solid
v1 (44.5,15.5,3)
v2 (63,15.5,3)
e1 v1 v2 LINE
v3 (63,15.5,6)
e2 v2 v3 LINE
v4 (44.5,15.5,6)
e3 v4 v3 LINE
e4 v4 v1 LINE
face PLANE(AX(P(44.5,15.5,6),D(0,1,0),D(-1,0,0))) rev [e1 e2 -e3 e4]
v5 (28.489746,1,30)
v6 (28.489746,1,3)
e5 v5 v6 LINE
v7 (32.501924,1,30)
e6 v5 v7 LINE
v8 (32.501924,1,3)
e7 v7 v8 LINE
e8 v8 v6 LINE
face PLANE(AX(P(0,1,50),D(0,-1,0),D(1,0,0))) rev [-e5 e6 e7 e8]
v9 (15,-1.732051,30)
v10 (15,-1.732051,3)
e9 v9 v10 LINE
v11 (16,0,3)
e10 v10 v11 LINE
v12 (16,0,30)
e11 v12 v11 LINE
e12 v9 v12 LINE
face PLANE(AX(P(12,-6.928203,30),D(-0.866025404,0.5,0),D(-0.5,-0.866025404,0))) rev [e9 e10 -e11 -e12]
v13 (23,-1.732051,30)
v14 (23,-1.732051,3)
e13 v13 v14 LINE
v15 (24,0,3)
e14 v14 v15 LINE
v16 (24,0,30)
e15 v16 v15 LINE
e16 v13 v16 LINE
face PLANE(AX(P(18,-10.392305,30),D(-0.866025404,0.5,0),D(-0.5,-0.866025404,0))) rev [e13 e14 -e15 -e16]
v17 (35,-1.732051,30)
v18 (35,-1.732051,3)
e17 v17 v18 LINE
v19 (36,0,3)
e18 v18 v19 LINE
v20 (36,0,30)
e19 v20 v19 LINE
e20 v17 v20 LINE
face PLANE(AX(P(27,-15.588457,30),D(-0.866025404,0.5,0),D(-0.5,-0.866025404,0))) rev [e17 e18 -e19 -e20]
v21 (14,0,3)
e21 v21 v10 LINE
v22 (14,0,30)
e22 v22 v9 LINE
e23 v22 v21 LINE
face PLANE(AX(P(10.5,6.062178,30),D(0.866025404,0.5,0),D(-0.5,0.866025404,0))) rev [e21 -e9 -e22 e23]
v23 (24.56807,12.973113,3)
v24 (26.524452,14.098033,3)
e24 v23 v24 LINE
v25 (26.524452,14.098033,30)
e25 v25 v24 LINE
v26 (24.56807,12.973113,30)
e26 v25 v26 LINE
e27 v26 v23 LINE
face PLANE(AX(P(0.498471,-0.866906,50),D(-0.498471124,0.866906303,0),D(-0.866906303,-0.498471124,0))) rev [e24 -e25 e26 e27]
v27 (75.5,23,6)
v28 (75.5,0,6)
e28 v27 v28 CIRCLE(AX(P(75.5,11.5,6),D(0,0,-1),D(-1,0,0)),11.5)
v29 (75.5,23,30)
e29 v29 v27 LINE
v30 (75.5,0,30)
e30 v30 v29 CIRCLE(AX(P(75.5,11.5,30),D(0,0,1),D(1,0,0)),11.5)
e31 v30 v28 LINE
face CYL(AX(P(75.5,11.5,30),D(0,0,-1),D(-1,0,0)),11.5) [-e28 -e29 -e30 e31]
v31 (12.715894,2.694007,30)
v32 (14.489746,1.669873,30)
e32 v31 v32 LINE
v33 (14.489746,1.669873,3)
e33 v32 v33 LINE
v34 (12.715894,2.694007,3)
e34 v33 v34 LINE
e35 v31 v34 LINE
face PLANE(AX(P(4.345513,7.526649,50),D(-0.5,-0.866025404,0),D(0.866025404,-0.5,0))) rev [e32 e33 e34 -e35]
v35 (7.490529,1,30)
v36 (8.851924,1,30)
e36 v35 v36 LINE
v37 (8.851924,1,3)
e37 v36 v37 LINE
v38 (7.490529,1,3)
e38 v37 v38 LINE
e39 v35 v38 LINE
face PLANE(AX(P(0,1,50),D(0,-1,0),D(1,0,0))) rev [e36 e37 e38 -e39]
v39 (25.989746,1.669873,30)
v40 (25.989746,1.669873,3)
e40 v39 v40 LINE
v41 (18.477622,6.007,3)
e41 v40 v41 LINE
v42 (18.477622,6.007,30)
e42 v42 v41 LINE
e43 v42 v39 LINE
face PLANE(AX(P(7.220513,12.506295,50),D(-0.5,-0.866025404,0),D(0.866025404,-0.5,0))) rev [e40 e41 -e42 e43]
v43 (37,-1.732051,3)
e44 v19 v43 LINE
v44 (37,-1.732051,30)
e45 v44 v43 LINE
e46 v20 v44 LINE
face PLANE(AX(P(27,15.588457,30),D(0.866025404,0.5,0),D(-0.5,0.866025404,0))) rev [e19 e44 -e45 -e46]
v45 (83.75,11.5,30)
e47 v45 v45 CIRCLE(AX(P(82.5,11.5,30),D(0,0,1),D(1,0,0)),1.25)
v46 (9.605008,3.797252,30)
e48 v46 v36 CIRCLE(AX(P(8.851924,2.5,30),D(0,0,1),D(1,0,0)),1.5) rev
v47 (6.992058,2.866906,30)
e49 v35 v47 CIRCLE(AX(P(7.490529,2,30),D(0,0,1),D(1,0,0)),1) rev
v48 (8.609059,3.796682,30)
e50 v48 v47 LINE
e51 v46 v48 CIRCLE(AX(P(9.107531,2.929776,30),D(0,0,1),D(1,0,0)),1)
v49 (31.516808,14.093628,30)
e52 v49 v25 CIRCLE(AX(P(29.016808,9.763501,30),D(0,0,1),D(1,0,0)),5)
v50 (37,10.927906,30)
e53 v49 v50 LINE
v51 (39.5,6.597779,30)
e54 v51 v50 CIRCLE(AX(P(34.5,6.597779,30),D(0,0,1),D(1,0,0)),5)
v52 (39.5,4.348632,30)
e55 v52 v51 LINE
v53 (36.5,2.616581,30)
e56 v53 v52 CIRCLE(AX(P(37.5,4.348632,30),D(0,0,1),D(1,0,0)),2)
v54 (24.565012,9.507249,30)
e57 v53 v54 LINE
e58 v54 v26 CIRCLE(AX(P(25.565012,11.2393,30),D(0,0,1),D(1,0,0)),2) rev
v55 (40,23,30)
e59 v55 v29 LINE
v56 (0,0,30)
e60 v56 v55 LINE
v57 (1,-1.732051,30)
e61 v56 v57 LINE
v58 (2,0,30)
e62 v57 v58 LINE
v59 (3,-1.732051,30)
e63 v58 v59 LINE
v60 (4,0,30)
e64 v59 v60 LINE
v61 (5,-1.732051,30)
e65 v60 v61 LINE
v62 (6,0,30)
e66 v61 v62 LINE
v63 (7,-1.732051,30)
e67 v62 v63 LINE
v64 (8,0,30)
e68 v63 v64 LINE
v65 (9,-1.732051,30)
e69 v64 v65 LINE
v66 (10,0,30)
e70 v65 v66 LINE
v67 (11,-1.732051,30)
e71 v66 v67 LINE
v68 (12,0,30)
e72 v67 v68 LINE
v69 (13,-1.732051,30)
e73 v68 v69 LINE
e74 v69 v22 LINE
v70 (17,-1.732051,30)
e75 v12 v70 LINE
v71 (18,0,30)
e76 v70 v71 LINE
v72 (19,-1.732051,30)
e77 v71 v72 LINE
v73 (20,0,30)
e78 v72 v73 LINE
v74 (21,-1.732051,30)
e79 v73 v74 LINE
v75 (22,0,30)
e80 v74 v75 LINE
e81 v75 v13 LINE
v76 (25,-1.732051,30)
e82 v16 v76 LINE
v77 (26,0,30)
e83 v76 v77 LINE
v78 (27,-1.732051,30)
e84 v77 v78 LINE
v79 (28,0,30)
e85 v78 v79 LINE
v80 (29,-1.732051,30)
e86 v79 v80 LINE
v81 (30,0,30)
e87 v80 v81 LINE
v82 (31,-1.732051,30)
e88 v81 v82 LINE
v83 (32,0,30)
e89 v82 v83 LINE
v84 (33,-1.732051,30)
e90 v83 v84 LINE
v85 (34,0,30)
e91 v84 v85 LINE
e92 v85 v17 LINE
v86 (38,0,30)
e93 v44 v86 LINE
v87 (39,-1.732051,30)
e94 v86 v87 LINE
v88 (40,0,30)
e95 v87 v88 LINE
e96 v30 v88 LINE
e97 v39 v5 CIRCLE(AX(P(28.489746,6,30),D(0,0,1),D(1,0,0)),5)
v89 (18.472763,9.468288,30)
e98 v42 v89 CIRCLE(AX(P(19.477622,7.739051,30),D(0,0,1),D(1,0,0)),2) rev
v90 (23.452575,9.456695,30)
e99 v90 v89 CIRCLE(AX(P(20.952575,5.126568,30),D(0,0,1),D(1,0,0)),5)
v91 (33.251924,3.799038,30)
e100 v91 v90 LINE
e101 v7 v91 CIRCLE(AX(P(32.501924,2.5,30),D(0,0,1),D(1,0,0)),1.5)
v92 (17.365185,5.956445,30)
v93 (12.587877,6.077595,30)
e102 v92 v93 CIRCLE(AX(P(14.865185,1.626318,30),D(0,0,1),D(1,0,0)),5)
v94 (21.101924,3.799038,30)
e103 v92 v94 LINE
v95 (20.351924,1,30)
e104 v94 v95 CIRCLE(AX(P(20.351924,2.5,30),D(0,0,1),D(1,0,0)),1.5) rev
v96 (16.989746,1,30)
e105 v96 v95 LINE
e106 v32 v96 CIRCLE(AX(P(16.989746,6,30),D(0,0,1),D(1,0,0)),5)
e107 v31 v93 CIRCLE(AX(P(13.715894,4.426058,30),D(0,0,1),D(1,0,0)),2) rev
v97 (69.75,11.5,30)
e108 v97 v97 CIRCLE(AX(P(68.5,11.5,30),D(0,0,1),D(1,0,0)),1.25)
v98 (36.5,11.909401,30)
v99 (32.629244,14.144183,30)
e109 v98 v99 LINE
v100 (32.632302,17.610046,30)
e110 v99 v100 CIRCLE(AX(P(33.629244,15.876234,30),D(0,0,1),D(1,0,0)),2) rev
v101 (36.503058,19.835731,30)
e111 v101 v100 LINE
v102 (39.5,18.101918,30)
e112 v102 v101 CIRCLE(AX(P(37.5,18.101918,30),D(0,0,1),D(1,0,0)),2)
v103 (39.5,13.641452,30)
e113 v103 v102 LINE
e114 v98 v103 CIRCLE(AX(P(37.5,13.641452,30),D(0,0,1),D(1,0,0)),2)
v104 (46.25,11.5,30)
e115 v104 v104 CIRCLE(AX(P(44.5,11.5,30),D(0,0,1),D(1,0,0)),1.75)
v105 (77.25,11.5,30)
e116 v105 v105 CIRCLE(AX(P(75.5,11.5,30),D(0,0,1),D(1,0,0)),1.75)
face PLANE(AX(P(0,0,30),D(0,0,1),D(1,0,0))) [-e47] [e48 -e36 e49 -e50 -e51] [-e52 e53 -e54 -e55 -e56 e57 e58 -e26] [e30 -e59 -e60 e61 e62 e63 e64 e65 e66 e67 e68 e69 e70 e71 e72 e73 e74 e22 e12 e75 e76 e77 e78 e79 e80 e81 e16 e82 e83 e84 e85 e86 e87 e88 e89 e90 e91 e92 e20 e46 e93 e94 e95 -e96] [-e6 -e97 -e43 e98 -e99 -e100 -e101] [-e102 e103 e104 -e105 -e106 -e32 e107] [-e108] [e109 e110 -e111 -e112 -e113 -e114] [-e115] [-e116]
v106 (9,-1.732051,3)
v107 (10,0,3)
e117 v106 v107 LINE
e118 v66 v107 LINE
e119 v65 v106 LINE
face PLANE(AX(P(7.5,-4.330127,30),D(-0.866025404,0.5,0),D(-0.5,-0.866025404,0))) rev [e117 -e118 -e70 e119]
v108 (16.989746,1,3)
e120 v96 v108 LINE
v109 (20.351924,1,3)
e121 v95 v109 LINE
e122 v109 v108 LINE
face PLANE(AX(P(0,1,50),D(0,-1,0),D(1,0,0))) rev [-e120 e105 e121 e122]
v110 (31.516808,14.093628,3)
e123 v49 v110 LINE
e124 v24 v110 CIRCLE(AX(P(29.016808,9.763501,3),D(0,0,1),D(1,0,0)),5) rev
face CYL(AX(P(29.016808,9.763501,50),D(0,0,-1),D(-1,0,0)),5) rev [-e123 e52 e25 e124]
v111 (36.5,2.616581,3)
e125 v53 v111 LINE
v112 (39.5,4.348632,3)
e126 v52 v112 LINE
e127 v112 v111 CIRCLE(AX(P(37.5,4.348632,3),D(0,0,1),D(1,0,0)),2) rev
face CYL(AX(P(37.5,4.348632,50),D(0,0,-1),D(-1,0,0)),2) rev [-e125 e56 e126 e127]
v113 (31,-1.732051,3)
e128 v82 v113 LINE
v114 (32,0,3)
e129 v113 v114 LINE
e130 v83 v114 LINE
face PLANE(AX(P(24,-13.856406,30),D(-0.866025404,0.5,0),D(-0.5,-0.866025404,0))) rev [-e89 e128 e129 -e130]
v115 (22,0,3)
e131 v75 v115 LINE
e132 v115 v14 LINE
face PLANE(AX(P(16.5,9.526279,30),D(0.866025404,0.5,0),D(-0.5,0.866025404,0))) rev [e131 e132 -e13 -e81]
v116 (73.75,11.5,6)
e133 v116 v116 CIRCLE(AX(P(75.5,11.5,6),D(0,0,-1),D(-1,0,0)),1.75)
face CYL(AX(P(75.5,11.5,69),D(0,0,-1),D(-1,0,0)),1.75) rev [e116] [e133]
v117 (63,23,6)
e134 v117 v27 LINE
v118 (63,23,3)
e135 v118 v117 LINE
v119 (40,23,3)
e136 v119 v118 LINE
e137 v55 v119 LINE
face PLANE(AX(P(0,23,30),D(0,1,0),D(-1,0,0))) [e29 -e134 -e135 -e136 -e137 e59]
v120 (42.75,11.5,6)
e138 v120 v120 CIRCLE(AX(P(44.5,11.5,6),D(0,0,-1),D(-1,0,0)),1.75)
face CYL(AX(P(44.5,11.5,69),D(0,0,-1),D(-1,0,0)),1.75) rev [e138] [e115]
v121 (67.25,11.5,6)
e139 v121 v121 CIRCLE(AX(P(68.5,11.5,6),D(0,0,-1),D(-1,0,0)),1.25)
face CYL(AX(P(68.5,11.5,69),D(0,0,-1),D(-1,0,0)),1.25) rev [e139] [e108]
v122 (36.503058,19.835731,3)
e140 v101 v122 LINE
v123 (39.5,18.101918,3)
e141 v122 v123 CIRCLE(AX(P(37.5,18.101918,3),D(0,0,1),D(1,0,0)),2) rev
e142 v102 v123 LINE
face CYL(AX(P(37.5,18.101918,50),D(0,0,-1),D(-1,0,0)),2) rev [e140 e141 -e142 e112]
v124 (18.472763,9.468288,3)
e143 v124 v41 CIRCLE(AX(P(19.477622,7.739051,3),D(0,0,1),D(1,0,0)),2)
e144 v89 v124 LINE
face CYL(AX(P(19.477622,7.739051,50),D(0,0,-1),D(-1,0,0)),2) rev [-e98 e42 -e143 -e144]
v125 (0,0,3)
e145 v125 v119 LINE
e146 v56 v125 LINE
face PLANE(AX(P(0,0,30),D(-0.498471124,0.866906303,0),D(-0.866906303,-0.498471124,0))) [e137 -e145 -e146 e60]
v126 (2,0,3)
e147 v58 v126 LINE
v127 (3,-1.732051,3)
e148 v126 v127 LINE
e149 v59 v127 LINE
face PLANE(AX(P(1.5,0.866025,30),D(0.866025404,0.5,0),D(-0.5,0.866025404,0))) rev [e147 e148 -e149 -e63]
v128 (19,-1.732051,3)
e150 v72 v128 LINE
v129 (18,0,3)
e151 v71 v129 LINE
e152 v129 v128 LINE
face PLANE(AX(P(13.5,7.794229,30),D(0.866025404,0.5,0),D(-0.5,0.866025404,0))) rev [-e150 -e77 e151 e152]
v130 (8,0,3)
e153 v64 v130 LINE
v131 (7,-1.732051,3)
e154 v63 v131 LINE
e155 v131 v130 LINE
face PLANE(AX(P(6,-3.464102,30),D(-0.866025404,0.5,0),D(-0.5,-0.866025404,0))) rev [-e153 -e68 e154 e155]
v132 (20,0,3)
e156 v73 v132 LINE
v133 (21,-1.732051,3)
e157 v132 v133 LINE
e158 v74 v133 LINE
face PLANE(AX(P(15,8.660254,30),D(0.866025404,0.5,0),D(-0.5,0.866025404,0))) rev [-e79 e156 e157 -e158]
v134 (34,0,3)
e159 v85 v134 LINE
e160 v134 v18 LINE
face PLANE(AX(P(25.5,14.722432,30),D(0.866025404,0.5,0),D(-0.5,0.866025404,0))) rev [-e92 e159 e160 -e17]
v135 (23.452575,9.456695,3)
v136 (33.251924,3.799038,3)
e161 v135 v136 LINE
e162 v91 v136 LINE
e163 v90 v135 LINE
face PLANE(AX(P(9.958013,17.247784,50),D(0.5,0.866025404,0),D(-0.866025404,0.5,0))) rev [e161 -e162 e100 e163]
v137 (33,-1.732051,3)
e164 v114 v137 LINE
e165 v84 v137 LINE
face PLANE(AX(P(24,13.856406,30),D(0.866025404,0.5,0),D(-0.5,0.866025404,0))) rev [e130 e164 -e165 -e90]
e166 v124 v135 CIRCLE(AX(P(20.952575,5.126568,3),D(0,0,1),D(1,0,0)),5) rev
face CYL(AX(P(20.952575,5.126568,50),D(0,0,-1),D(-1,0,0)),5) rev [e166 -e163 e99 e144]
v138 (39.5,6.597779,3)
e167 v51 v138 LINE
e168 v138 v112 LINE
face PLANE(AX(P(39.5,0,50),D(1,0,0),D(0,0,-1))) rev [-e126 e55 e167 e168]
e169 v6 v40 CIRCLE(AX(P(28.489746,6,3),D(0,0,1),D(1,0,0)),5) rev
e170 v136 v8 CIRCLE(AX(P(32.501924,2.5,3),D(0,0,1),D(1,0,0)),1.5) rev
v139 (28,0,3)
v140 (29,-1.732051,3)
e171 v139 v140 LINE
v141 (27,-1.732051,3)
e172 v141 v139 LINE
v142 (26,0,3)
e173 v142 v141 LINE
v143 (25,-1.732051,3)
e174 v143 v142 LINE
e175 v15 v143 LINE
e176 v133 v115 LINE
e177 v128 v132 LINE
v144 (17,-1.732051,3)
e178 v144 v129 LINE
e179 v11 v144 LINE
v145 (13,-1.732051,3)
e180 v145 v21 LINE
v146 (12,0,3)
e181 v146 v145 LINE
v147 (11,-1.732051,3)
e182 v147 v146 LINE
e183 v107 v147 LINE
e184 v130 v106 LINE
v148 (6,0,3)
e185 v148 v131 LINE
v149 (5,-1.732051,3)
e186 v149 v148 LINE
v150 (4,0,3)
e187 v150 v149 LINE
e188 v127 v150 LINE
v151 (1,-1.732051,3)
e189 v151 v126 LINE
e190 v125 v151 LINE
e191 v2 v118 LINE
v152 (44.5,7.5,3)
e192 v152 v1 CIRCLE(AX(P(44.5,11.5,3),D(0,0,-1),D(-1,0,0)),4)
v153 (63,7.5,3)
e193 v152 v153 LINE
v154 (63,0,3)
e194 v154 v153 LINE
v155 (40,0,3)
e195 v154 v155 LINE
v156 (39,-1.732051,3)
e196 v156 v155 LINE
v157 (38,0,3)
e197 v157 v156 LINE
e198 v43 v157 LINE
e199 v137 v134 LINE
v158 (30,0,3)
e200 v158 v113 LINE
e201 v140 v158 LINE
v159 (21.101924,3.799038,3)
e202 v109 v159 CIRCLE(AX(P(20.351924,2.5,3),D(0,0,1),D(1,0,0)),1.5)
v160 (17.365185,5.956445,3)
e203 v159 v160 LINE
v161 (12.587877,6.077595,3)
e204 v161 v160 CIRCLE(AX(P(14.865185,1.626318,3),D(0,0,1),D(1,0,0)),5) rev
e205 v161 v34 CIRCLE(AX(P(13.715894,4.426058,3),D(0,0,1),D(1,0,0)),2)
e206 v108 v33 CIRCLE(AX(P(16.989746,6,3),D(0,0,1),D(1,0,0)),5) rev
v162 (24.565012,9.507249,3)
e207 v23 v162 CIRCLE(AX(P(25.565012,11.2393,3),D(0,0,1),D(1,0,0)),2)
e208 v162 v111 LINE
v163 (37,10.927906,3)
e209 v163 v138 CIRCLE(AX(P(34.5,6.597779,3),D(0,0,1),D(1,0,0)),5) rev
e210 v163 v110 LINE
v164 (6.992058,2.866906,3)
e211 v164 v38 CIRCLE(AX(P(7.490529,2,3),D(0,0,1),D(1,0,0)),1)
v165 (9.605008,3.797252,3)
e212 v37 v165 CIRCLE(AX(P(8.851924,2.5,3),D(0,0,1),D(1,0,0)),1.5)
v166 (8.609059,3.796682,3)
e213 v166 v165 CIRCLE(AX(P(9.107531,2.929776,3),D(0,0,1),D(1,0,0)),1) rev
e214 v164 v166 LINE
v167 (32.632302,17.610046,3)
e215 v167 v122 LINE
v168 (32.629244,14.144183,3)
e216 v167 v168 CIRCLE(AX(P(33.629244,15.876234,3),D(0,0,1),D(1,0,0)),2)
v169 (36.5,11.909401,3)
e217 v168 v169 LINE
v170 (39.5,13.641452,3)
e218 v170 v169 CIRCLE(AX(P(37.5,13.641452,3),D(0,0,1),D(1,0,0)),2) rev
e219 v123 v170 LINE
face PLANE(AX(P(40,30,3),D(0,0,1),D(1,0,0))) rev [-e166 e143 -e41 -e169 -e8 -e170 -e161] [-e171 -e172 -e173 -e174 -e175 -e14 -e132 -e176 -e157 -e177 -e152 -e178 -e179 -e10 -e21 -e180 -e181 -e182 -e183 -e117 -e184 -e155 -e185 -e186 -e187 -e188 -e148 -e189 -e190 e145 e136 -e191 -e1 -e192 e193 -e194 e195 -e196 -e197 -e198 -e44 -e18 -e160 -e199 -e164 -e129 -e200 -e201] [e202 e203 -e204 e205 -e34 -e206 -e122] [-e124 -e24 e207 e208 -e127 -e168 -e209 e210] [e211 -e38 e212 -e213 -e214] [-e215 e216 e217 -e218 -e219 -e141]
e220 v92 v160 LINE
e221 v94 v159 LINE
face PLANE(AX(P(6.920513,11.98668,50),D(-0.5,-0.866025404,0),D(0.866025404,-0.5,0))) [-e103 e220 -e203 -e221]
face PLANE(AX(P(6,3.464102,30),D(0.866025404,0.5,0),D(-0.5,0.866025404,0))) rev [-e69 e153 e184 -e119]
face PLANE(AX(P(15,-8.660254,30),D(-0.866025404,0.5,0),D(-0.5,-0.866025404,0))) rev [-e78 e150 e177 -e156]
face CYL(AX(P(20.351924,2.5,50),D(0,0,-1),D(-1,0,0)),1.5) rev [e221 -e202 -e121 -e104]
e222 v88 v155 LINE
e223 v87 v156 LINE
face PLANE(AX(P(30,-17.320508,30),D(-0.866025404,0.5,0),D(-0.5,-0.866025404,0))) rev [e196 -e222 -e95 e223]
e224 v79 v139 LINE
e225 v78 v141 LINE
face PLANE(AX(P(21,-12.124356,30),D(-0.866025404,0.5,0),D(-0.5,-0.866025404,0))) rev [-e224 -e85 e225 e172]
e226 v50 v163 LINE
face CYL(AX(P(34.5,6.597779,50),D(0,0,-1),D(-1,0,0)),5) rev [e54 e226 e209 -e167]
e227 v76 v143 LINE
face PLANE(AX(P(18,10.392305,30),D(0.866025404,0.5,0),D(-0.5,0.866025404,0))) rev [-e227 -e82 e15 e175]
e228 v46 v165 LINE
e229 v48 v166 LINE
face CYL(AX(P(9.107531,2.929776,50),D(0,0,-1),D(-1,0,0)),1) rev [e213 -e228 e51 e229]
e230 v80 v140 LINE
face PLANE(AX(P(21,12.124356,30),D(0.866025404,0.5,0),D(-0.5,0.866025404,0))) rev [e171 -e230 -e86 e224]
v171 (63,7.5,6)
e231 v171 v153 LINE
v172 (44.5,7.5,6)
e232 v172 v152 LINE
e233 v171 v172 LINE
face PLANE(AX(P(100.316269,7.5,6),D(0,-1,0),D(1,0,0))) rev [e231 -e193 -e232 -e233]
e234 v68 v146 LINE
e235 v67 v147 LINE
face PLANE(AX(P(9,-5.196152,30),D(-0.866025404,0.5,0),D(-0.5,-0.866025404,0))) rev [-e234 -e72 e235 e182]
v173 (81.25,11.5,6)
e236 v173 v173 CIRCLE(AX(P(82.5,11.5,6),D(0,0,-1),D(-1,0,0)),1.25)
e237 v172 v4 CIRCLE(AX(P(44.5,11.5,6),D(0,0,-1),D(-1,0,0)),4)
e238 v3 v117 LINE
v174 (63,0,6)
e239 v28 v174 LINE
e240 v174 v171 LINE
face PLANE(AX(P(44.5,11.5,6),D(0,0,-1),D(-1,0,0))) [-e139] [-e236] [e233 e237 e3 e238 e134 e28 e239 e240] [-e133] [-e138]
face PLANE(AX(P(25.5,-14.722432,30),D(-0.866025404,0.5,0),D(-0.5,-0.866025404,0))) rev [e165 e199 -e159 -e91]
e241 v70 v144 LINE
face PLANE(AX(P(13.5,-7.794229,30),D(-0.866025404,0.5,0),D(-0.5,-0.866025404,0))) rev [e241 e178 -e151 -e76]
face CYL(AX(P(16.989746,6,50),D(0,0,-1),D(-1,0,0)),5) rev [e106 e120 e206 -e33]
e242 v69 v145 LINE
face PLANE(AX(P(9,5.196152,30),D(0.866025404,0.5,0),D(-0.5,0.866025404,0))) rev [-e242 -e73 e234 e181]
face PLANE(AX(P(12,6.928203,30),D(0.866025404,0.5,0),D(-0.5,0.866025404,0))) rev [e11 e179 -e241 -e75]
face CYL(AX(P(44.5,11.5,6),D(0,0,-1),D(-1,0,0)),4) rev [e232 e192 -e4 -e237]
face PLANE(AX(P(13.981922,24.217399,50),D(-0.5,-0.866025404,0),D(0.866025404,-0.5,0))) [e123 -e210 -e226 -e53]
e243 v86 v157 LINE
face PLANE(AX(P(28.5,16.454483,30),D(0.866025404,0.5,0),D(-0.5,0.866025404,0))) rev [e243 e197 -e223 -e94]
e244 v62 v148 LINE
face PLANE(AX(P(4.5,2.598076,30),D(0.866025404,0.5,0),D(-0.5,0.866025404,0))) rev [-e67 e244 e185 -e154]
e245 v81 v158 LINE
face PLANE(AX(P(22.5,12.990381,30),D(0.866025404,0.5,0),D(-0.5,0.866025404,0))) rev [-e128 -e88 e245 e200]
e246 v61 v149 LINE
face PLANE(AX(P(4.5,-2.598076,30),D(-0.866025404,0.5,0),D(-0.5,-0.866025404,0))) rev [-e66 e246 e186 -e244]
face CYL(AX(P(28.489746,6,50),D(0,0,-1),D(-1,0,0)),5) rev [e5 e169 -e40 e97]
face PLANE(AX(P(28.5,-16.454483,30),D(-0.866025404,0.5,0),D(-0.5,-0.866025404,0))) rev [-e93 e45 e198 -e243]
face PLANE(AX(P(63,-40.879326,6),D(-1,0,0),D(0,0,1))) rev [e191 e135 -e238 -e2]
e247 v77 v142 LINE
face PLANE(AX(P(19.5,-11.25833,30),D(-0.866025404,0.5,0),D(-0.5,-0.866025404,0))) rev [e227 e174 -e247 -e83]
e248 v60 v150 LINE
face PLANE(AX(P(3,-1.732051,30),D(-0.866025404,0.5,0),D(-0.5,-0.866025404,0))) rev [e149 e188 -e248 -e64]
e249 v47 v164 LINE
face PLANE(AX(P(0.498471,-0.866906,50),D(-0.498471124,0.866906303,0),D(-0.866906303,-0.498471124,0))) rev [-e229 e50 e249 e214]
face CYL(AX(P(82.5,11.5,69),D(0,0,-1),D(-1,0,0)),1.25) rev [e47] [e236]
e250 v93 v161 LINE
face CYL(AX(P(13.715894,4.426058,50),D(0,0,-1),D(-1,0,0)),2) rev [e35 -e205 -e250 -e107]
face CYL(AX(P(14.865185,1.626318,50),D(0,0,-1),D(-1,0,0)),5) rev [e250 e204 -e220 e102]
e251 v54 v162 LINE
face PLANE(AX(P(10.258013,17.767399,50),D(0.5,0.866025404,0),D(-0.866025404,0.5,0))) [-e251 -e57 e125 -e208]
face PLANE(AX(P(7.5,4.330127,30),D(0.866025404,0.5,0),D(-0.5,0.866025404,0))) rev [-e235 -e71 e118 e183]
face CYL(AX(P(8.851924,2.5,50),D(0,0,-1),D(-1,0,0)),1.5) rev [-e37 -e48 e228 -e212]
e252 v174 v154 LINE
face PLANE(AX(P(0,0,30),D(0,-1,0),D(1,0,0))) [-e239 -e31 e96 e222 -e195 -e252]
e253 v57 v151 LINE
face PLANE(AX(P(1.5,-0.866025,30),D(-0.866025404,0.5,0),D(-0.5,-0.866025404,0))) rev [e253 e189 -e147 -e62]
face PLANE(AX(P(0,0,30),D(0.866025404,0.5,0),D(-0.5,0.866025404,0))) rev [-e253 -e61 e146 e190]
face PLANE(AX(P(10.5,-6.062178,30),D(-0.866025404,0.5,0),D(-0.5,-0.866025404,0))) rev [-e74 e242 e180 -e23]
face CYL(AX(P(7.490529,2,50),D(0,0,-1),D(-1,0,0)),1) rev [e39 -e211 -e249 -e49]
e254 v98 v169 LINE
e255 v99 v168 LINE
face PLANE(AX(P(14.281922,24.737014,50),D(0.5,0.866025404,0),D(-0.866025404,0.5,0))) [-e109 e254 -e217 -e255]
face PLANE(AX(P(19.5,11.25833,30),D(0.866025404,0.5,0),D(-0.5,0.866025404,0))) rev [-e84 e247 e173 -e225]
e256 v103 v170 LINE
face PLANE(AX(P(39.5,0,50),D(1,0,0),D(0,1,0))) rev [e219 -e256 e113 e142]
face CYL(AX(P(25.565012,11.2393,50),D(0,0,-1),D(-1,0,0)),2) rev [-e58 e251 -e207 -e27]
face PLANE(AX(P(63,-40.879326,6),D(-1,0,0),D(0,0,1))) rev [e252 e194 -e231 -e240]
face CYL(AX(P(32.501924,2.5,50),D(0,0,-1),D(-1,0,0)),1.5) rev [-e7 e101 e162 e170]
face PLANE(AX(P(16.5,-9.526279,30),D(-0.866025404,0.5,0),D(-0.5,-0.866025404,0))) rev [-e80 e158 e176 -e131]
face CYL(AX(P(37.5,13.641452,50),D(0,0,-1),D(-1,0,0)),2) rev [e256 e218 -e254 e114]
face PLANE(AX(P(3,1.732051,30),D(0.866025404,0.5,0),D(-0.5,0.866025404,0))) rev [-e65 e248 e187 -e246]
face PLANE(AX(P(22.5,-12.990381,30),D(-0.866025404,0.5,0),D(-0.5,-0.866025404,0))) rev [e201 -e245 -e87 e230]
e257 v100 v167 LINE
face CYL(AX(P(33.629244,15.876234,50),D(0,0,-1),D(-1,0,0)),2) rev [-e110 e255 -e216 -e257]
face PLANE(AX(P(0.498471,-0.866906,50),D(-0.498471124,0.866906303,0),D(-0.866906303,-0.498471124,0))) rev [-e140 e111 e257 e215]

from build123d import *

# Parameters (mm, degrees)
BOSS_EXTRUDE1_DEPTH = 30
SKETCH4_W           = 47
SKETCH4_H           = 3
CUT_EXTRUDE1_DEPTH  = 30
CUT_EXTRUDE2_DEPTH  = 3
SKETCH6_R           = 11.5
CUT_EXTRUDE3_DEPTH  = 3
CUT_EXTRUDE4_DEPTH  = 3
SKETCH8_R           = 1.75
CUT_EXTRUDE5_DEPTH  = 63
SKETCH9_R           = 1.25
CUT_EXTRUDE6_DEPTH  = 63
SKETCH11_R          = 1.75
CUT_EXTRUDE7_DEPTH  = 63
CUT_EXTRUDE8_START  = -30
CUT_EXTRUDE8_DEPTH  = 30
CUT_EXTRUDE12_DEPTH = 3
SKETCH26_W          = 13.519432365
SKETCH26_H          = 72.724713812
CUT_EXTRUDE18_DEPTH = 3
SKETCH21_W          = 40
SKETCH21_H          = 3
CUT_EXTRUDE16_DEPTH = 27
SKETCH19_W          = 40
SKETCH19_H          = 3
CUT_EXTRUDE15_DEPTH = 77
SKETCH27_W          = 110.290259741
SKETCH27_H          = 28.330573593
CUT_EXTRUDE19_DEPTH = 98.765024421


# Read off the part's stored shape, not the designer's step: Cut-Extrude8
with BuildPart() as part:
    # Sketch2 → Boss-Extrude1 (new body)
    with BuildSketch(Plane.XY):
        Polygon((2, 0), (0, 0), (1, -1.732050808), align=None)
        Polygon((4, 0), (2, 0), (3, -1.732050808), align=None)
        Polygon((6, 0), (4, 0), (5, -1.732050808), align=None)
        Polygon((8, 0), (6, 0), (7, -1.732050808), align=None)
        Polygon((10, 0), (8, 0), (9, -1.732050808), align=None)
        Polygon((12, 0), (10, 0), (11, -1.732050808), align=None)
        Polygon((14, 0), (12, 0), (13, -1.732050808), align=None)
        Polygon((16, 0), (14, 0), (15, -1.732050808), align=None)
        Polygon((18, 0), (16, 0), (17, -1.732050808), align=None)
        Polygon((20, 0), (18, 0), (19, -1.732050808), align=None)
        Polygon((22, 0), (20, 0), (21, -1.732050808), align=None)
        Polygon((24, 0), (22, 0), (23, -1.732050808), align=None)
        Polygon((25, -1.732050808), (26, 0), (24, 0), align=None)
        Polygon((27, -1.732050808), (28, 0), (26, 0), align=None)
        Polygon((29, -1.732050808), (30, 0), (28, 0), align=None)
        Polygon((31, -1.732050808), (32, 0), (30, 0), align=None)
        Polygon((33, -1.732050808), (34, 0), (32, 0), align=None)
        Polygon((35, -1.732050808), (36, 0), (34, 0), align=None)
        Polygon((37, -1.732050808), (38, 0), (36, 0), align=None)
        Polygon((39, -1.732050808), (40, 0), (38, 0), align=None)
        Polygon((75.5, 23), (75.5, 0), (0, 0), (40, 23), align=None)
        with BuildLine():
            ThreePointArc((75.5, 0), (87, 11.5), (75.5, 23))
            Line((75.5, 23), (75.5, 0))
        make_face()
    extrude(amount=BOSS_EXTRUDE1_DEPTH)

    # Sketch4 → Cut-Extrude1 (cut)
    with BuildSketch(Plane.XZ):
        with Locations((63.5, 1.5)):
            Rectangle(SKETCH4_W, SKETCH4_H)
    extrude(amount=-CUT_EXTRUDE1_DEPTH, mode=Mode.SUBTRACT)

    # Sketch5 → Cut-Extrude2 (cut)
    with BuildSketch(Plane(origin=(0, 0, 3), x_dir=(-1, 0, 0), z_dir=(0, 0, -1))):
        with BuildLine():
            Line((-44.5, 15.5), (-100.316269326, 15.5))
            Line((-100.316269326, 15.5), (-100.316269326, 7.5))
            Line((-100.316269326, 7.5), (-44.5, 7.5))
            ThreePointArc((-44.5, 7.5), (-40.5, 11.5), (-44.5, 15.5))
        make_face()
    extrude(amount=-CUT_EXTRUDE2_DEPTH, mode=Mode.SUBTRACT)

    # Sketch6 → Cut-Extrude3 (cut)
    with BuildSketch(Plane(origin=(0, 0, 3), x_dir=(-1, 0, 0), z_dir=(0, 0, -1))):
        with Locations((-75.5, 11.5)):
            Circle(SKETCH6_R)
    extrude(amount=-CUT_EXTRUDE3_DEPTH, mode=Mode.SUBTRACT)

    # Sketch7 → Cut-Extrude4 (cut)
    with BuildSketch(Plane(origin=(0, 0, 3), x_dir=(-1, 0, 0), z_dir=(0, 0, -1))):
        with BuildLine():
            Line((-64.718070674, 7.5), (-64.718070674, 0))
            Line((-64.718070674, 0), (-75.5, 0))
            ThreePointArc((-75.5, 0), (-68.933037232, 2.059396206), (-64.718070674, 7.5))
        make_face()
    extrude(amount=-CUT_EXTRUDE4_DEPTH, mode=Mode.SUBTRACT)

    # Sketch8 → Cut-Extrude5 (cut)
    with BuildSketch(Plane(origin=(0, 0, 6), x_dir=(-1, 0, 0), z_dir=(0, 0, -1))):
        with Locations((-75.5, 11.5)):
            Circle(SKETCH8_R)
    extrude(amount=-CUT_EXTRUDE5_DEPTH, mode=Mode.SUBTRACT)

    # Sketch9 → Cut-Extrude6 (cut)
    with BuildSketch(Plane(origin=(0, 0, 6), x_dir=(-1, 0, 0), z_dir=(0, 0, -1))):
        with Locations((-68.5, 11.5)):
            Circle(SKETCH9_R)
        with Locations((-82.5, 11.5)):
            Circle(SKETCH9_R)
    extrude(amount=-CUT_EXTRUDE6_DEPTH, mode=Mode.SUBTRACT)

    # Sketch11 → Cut-Extrude7 (cut)
    with BuildSketch(Plane(origin=(0, 0, 6), x_dir=(-1, 0, 0), z_dir=(0, 0, -1))):
        with Locations((-44.5, 11.5)):
            Circle(SKETCH11_R)
    extrude(amount=-CUT_EXTRUDE7_DEPTH, mode=Mode.SUBTRACT)

    # Cut-Extrude8 outline → Cut-Extrude8 (cut)
    with BuildSketch(Plane(origin=(0, 0, 0), x_dir=(-1, 0, 0), z_dir=(0, 0, -1)).offset(CUT_EXTRUDE8_START)):
        with BuildLine():
            ThreePointArc((-32.629244175, 14.144182994), (-31.629244953, 15.877998297), (-32.632301926, 17.610046408))
            Line((-32.632301926, 17.610046408), (-36.503057751, 19.835731008))
            ThreePointArc((-36.503057751, 19.835731008), (-38.501527709, 19.833086287), (-39.5, 18.101918401))
            Line((-39.5, 18.101918401), (-39.5, 13.641451884))
            ThreePointArc((-39.5, 13.641451884), (-38.5, 11.909401077), (-36.5, 11.909401077))
            Line((-36.5, 11.909401077), (-32.629244175, 14.144182994))
        make_face()
        with BuildLine():
            ThreePointArc((-7.49052939, 1), (-6.524375597, 1.742033241), (-6.992058265, 2.866906303))
            Line((-6.992058265, 2.866906303), (-8.609059399, 3.796681955))
            ThreePointArc((-8.609059399, 3.796681955), (-9.106957749, 3.929775488), (-9.605008237, 3.797252409))
            ThreePointArc((-9.605008237, 3.797252409), (-10.300350282, 2.110050397), (-8.851923789, 1))
            Line((-8.851923789, 1), (-7.49052939, 1))
        make_face()
        with BuildLine():
            ThreePointArc((-24.565011822, 9.507249391), (-23.5650126, 11.241064694), (-24.568069573, 12.973112805))
            Line((-24.568069573, 12.973112805), (-26.524452009, 14.098032706))
            ThreePointArc((-26.524452009, 14.098032706), (-29.021218869, 14.763499245), (-31.516807631, 14.09362821))
            Line((-31.516807631, 14.09362821), (-37, 10.927905619))
            ThreePointArc((-37, 10.927905619), (-38.830127019, 9.0977786), (-39.5, 6.5977786))
            Line((-39.5, 6.5977786), (-39.5, 4.348631561))
            ThreePointArc((-39.5, 4.348631561), (-38.5, 2.616580754), (-36.5, 2.616580754))
            Line((-36.5, 2.616580754), (-24.565011822, 9.507249391))
        make_face()
        with BuildLine():
            ThreePointArc((-21.101923789, 3.799038106), (-21.800812528, 2.111771433), (-20.351923789, 1))
            Line((-20.351923789, 1), (-16.989745962, 1))
            ThreePointArc((-16.989745962, 1), (-15.695650737, 1.170370869), (-14.489745962, 1.669872981))
            Line((-14.489745962, 1.669872981), (-12.715894213, 2.694006766))
            ThreePointArc((-12.715894213, 2.694006766), (-11.717324154, 4.350441969), (-12.587876643, 6.077595149))
            ThreePointArc((-12.587876643, 6.077595149), (-14.991941557, 6.624711226), (-17.365185047, 5.956445224))
            Line((-17.365185047, 5.956445224), (-21.101923789, 3.799038106))
        make_face()
        with BuildLine():
            ThreePointArc((-33.251923789, 3.799038106), (-33.950812528, 2.111771433), (-32.501923789, 1))
            Line((-32.501923789, 1), (-28.489745962, 1))
            ThreePointArc((-28.489745962, 1), (-27.195650737, 1.170370869), (-25.989745962, 1.669872981))
            Line((-25.989745962, 1.669872981), (-18.477621591, 6.007000009))
            ThreePointArc((-18.477621591, 6.007000009), (-17.477623561, 7.73624352), (-18.472763157, 9.468287505))
            ThreePointArc((-18.472763157, 9.468287505), (-20.964215142, 10.126554039), (-23.452575278, 9.456694606))
            Line((-23.452575278, 9.456694606), (-33.251923789, 3.799038106))
        make_face()
    extrude(amount=CUT_EXTRUDE8_DEPTH, mode=Mode.SUBTRACT)

    # Sketch15 → Cut-Extrude12 (cut)
    with BuildSketch(Plane(origin=(0, 0, 3), x_dir=(-1, 0, 0), z_dir=(0, 0, -1))):
        with BuildLine():
            Line((-75.5, 23), (-70.601020514, 23))
            ThreePointArc((-70.601020514, 23), (-66.32756197, 19.992136397), (-63.657280718, 15.5))
            Line((-63.657280718, 15.5), (-64.718070674, 15.5))
            ThreePointArc((-64.718070674, 15.5), (-68.933037232, 20.940603794), (-75.5, 23))
        make_face()
    extrude(amount=-CUT_EXTRUDE12_DEPTH, mode=Mode.SUBTRACT)


with BuildPart() as body_2:
    # Mirror6: mirrored copy
    add(part.part.mirror(Plane(origin=(0, -5, 0), x_dir=(0, 0, 1), z_dir=(0, -1, 0))))


with BuildPart() as cut_extrude18_tool:
    # Sketch26 → Cut-Extrude18 (new body)
    with BuildSketch(Plane(origin=(0, 0, 3), x_dir=(-1, 0, 0), z_dir=(0, 0, -1))):
        with Locations((-69.759716183, -4.516968795)):
            Rectangle(SKETCH26_W, SKETCH26_H)
    extrude(amount=-CUT_EXTRUDE18_DEPTH)


with BuildPart() as part_1:
    add(part.part)

    # Cut-Extrude18: cut by cut_extrude18_tool
    add(cut_extrude18_tool.part, mode=Mode.SUBTRACT)

    # Sketch21 → Cut-Extrude16 (cut)
    with BuildSketch(Plane(origin=(0, 23, 0), x_dir=(1, 0, 0), z_dir=(0, 1, 0))):
        with Locations((20, -1.5)):
            Rectangle(SKETCH21_W, SKETCH21_H)
    extrude(amount=-CUT_EXTRUDE16_DEPTH, mode=Mode.SUBTRACT)


with BuildPart() as body_2_1:
    add(body_2.part)

    # Cut-Extrude18: cut by cut_extrude18_tool
    add(cut_extrude18_tool.part, mode=Mode.SUBTRACT)

    # Sketch19 → Cut-Extrude15 (cut)
    with BuildSketch(Plane.XZ.offset(33)):
        with Locations((20, 1.5)):
            Rectangle(SKETCH19_W, SKETCH19_H)
    extrude(amount=-CUT_EXTRUDE15_DEPTH, mode=Mode.SUBTRACT)

    # Sketch27 → Cut-Extrude19 (cut, through all)
    with BuildSketch(Plane.XY):
        with Locations((42.931493507, -21.344561689)):
            Rectangle(SKETCH27_W, SKETCH27_H)
    extrude(amount=CUT_EXTRUDE19_DEPTH, mode=Mode.SUBTRACT)


solid = part_1.part
